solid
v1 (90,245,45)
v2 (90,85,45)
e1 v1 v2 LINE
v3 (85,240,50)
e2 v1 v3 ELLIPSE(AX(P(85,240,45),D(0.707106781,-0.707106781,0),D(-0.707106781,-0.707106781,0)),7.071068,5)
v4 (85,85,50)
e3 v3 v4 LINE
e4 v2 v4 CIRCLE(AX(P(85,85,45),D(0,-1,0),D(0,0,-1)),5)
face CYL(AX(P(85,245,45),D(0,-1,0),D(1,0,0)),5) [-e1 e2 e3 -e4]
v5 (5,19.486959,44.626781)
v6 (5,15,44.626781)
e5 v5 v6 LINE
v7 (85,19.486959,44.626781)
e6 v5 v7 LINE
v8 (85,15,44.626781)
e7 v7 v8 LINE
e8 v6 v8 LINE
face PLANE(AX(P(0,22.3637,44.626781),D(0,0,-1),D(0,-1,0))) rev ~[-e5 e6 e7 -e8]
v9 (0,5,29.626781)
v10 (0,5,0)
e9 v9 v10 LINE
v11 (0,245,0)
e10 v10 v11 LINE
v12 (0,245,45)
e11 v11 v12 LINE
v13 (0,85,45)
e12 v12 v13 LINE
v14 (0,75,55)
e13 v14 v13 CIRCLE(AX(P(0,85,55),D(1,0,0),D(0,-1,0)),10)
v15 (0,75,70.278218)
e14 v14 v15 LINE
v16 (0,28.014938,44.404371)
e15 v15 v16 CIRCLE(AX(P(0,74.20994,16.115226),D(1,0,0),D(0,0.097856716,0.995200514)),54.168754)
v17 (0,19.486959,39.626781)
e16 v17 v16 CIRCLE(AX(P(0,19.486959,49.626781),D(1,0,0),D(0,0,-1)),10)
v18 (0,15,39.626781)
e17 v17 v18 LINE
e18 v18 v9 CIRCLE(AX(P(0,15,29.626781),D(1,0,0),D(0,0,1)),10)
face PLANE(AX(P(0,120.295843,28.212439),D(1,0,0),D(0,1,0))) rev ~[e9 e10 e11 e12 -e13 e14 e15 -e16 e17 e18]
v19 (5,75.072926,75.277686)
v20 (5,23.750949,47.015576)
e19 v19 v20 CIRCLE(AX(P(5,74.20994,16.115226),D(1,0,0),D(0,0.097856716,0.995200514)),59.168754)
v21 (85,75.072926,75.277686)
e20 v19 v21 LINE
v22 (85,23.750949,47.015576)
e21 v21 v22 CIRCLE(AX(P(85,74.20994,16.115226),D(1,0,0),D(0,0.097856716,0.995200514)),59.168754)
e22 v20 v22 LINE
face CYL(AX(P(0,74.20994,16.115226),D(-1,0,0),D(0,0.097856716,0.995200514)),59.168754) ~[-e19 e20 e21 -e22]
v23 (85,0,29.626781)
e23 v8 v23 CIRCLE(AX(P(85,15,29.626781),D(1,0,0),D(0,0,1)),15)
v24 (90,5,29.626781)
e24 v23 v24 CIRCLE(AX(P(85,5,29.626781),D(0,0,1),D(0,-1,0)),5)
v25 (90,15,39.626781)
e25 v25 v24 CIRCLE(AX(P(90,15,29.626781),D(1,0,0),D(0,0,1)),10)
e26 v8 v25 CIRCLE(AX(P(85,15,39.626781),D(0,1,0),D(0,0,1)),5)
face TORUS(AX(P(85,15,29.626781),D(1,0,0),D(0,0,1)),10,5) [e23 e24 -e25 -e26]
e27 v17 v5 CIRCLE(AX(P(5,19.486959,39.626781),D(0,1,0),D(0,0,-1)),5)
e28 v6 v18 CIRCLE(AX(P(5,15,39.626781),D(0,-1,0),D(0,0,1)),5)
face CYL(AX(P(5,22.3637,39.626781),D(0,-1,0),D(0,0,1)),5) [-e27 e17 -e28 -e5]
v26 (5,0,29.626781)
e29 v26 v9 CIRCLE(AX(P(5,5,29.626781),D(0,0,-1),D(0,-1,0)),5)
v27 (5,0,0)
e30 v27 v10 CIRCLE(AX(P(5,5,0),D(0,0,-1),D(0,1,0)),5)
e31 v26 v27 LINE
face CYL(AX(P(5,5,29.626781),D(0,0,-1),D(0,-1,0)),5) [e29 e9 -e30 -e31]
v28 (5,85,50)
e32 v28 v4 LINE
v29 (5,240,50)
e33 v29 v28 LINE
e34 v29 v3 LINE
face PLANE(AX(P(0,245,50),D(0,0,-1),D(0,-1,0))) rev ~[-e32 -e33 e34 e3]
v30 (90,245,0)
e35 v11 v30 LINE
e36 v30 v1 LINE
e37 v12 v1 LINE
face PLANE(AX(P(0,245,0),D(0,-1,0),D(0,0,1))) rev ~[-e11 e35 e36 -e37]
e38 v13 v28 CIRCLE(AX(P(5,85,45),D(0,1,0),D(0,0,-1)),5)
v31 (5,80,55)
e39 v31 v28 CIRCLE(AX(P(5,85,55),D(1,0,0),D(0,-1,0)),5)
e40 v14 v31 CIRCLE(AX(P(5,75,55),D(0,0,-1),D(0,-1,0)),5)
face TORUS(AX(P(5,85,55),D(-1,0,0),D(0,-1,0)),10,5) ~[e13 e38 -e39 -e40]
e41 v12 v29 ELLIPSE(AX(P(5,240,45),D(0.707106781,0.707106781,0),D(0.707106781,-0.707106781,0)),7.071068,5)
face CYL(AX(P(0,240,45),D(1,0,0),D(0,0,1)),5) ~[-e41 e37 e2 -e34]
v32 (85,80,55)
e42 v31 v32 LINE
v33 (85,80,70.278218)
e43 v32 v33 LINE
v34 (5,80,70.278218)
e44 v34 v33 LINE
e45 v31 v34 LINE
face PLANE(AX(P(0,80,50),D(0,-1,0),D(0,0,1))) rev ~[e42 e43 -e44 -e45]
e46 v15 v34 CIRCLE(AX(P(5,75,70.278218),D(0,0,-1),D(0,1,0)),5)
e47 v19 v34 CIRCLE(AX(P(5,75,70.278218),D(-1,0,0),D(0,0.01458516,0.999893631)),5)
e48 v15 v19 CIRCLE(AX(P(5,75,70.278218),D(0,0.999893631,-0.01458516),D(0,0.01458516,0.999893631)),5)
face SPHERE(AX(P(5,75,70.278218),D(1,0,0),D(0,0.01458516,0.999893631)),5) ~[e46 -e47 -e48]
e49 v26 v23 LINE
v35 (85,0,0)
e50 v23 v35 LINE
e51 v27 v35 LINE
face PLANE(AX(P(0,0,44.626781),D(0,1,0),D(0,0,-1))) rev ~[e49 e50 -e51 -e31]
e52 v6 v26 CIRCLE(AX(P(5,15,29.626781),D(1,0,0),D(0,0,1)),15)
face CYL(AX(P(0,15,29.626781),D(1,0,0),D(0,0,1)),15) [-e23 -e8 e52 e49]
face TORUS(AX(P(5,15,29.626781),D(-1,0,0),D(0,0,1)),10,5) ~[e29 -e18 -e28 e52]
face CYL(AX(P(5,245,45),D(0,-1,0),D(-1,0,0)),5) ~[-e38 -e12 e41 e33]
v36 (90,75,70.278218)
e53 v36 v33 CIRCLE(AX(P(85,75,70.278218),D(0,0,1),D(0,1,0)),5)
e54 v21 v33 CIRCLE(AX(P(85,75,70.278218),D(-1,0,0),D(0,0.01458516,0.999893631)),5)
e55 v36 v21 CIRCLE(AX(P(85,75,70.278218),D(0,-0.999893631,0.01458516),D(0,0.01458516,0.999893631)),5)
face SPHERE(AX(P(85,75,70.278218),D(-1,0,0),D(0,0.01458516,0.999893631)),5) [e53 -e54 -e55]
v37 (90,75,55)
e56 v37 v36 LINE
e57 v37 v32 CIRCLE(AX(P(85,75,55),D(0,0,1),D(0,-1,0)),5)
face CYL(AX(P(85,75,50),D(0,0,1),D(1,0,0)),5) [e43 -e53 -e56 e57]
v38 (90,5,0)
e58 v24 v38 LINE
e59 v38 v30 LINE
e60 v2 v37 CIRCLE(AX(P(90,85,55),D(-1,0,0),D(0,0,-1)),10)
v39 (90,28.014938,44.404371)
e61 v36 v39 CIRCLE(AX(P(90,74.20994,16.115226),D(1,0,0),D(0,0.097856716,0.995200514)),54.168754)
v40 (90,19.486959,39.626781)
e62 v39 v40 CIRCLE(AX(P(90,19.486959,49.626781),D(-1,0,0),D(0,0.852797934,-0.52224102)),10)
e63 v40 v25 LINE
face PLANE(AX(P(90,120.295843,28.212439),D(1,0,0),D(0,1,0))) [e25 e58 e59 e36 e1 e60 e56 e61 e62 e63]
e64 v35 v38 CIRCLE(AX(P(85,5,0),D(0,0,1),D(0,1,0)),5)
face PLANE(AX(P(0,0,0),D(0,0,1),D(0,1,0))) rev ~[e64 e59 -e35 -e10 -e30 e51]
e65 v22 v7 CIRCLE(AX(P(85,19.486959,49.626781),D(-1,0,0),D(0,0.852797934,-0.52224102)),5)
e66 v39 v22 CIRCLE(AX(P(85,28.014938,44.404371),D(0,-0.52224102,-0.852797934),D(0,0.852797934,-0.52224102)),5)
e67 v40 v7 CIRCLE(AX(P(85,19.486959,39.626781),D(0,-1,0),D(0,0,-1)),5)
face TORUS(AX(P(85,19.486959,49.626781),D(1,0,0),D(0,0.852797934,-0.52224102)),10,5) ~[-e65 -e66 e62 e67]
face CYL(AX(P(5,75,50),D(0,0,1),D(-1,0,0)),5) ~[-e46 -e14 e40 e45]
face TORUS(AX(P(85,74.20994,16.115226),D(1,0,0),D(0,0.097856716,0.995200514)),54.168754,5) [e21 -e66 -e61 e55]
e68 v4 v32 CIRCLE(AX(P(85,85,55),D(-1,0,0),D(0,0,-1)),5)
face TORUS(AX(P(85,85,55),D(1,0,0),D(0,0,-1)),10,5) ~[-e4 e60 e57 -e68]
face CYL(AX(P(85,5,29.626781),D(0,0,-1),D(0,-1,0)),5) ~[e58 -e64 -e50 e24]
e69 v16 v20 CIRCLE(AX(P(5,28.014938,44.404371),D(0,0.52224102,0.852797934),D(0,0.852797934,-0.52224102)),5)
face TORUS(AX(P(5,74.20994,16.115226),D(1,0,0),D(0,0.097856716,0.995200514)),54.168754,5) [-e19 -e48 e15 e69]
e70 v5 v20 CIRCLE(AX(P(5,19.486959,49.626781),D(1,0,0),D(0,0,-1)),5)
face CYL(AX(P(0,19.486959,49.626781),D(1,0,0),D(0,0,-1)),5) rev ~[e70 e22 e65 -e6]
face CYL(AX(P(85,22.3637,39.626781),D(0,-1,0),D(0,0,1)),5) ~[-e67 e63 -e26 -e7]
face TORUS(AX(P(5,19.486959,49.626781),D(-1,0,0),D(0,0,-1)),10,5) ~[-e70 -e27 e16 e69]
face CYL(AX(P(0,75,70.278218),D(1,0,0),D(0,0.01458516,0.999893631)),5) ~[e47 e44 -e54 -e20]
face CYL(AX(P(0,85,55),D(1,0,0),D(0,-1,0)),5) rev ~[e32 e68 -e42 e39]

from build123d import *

# Parameters (mm, degrees)
F1_DEPTH = 90
F2_R     = 15
F3_R     = 5


with BuildPart() as f1:
    # F0 (on Right) → F1 (new body)
    with BuildSketch(Plane.YZ):
        with BuildLine():
            Line((0, 15), (0, 0))
            Line((0, 0), (245, 0))
            Line((245, 0), (245, 50))
            Line((245, 50), (80, 50))
            Line((80, 50), (80, 75))
            ThreePointArc((80, 75), (46.6250520012, 68.4603820444), (22.3636995256, 44.6267811209))
            Line((22.3636995256, 44.6267811209), (0, 44.6267811209))
            Line((0, 44.6267811209), (0, 15))
        make_face()
    extrude(amount=F1_DEPTH)

    # F2
    f2_edges = [f1.edges().sort_by_distance(p)[0] for p in [
        (45, 0, 44.626781),
    ]]
    fillet(f2_edges, radius=F2_R)

    # F3
    f3_edges = [f1.edges().sort_by_distance(p)[0] for p in [
        (90, 46.625052, 68.460382),
        (90, 162.5, 50),
        (90, 18.68185, 44.626781),
        (45, 22.3637, 44.626781),
        (0, 18.68185, 44.626781),
        (0, 80, 62.5),
        (0, 162.5, 50),
        (45, 245, 50),
        (90, 80, 62.5),
        (45, 80, 75),
        (45, 80, 50),
        (0, 4.393398, 40.233383),
        (0, 46.625052, 68.460382),
        (0, 0, 14.813391),
        (90, 4.393398, 40.233383),
        (90, 0, 14.813391),
    ]]
    fillet(f3_edges, radius=F3_R)


solid = f1.part
